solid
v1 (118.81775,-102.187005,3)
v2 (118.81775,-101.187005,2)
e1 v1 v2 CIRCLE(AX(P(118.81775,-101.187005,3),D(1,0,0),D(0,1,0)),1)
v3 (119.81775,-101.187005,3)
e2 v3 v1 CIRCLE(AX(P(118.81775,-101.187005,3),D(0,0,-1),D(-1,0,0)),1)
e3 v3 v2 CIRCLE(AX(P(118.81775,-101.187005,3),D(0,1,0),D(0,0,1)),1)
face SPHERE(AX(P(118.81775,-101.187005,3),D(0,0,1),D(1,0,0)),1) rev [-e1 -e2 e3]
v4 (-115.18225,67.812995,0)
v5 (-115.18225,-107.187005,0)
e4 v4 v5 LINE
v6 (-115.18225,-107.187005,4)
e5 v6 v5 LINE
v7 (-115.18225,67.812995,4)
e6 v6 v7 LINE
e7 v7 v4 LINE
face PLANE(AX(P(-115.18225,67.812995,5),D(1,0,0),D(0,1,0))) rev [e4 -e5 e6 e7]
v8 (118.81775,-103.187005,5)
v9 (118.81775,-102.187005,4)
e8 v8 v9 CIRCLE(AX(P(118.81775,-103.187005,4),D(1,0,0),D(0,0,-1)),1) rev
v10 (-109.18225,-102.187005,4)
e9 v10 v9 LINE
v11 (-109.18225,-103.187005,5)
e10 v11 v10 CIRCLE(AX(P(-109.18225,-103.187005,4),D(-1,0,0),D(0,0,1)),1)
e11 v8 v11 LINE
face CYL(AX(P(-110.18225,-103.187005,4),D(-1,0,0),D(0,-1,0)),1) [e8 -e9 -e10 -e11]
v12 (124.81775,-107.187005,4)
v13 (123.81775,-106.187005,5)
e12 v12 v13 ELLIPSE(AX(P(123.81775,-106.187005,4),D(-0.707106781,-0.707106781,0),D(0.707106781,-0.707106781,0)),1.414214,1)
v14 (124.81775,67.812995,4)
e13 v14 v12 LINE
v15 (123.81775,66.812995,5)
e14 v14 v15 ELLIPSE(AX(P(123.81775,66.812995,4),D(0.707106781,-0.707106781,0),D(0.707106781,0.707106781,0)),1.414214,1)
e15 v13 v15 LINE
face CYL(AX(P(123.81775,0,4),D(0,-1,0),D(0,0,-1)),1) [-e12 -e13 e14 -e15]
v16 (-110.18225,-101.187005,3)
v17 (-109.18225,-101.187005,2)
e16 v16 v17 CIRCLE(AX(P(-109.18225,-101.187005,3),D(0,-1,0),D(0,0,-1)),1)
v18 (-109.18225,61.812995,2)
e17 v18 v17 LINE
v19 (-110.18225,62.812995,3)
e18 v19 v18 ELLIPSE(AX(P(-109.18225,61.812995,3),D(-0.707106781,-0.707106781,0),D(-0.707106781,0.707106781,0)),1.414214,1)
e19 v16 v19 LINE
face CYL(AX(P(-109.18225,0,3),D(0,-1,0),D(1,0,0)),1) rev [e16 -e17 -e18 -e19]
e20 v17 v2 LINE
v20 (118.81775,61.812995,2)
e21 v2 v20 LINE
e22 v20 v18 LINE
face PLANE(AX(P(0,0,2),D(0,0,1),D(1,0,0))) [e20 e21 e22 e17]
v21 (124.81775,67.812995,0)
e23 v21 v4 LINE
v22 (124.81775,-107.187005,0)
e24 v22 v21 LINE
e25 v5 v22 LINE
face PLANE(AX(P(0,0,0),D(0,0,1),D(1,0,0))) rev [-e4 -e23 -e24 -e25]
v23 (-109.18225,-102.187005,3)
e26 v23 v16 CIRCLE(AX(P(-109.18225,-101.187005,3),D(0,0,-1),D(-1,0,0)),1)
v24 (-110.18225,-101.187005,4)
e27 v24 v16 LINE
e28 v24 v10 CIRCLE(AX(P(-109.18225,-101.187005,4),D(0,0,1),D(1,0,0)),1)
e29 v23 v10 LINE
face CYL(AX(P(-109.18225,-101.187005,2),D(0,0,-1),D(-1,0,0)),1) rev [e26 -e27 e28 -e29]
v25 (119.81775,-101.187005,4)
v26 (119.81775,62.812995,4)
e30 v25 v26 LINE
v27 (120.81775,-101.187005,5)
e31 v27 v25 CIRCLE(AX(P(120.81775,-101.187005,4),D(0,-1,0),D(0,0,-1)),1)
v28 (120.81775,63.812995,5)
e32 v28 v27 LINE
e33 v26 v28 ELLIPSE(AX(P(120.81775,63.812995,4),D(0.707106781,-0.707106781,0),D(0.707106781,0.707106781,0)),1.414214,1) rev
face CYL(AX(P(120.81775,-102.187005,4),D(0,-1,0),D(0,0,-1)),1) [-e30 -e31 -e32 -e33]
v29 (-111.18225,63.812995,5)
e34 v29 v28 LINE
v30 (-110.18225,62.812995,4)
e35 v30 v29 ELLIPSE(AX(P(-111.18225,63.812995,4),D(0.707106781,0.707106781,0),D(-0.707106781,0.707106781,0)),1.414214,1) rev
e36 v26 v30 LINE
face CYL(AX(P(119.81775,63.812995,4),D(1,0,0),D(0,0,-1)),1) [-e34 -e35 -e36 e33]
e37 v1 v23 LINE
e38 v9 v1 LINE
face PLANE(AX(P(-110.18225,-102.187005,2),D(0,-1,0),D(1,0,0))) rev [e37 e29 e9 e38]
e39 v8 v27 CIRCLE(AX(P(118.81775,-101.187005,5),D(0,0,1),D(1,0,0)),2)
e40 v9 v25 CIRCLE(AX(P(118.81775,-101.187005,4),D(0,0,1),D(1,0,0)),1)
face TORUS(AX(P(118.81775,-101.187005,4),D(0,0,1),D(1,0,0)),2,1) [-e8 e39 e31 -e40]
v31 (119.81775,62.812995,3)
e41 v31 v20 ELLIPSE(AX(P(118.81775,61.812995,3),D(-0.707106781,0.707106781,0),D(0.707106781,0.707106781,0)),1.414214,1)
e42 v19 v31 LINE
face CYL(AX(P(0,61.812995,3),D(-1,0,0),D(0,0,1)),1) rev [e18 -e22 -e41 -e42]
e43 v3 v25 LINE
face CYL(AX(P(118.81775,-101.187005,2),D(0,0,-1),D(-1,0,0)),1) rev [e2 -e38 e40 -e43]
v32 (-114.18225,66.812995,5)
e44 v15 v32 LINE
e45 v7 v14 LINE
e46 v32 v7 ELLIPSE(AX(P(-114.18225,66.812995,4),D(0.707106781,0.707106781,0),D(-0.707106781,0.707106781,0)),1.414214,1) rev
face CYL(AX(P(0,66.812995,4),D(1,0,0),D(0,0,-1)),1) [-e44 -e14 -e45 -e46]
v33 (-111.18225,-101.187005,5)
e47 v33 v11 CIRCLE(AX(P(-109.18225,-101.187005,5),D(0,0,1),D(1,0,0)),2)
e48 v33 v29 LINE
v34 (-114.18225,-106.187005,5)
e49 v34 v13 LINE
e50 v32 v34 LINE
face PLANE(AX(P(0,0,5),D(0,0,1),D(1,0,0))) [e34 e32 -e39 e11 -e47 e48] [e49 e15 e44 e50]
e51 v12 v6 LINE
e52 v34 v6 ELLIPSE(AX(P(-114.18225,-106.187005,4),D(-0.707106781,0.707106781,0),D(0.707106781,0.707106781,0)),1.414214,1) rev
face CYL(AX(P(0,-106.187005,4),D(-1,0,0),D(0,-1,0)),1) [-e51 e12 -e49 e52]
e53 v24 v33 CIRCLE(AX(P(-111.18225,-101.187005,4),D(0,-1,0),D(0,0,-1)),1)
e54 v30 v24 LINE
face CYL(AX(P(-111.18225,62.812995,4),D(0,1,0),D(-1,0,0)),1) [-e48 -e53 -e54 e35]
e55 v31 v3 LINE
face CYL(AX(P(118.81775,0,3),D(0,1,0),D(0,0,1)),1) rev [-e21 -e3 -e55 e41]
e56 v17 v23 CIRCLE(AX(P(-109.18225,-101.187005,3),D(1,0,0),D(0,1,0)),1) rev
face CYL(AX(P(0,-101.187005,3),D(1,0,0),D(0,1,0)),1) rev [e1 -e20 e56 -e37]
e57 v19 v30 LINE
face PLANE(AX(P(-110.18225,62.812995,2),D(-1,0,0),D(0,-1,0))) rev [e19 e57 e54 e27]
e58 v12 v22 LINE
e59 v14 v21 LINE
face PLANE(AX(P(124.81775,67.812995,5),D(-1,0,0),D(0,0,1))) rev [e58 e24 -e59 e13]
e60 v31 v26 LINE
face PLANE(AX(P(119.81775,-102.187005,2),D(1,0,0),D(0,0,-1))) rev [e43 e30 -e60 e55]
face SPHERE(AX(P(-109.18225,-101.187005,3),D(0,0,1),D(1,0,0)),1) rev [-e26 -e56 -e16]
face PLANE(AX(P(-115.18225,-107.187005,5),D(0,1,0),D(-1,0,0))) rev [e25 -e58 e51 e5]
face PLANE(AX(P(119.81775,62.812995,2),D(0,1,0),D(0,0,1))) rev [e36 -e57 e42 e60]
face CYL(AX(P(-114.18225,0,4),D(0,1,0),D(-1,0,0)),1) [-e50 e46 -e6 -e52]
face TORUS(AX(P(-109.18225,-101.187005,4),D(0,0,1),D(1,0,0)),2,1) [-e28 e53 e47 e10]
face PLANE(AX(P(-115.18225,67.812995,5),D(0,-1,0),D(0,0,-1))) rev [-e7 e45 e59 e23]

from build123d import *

# Parameters (mm, degrees)
SKETCH1_W           = 240
SKETCH1_H           = 175
BOSS_EXTRUDE1_DEPTH = 5
SKETCH2_W           = 230
SKETCH2_H           = 165
CUT_EXTRUDE1_DEPTH  = 3
FILLET1_R           = 1
FILLET2_R           = 1
FILLET3_R           = 1


with BuildPart() as part:
    # Sketch1 → Boss-Extrude1 (new body)
    with BuildSketch(Plane.XY):
        with Locations((4.817749604, -19.687004754)):
            Rectangle(SKETCH1_W, SKETCH1_H)
    extrude(amount=BOSS_EXTRUDE1_DEPTH)

    # Sketch2 → Cut-Extrude1 (cut)
    with BuildSketch(Plane.XY.offset(5)):
        with Locations((4.817749604, -19.687004754)):
            Rectangle(SKETCH2_W, SKETCH2_H)
    extrude(amount=-CUT_EXTRUDE1_DEPTH, mode=Mode.SUBTRACT)

    # Fillet1
    fillet1_edges = [part.edges().sort_by_distance(p)[0] for p in [
        (4.817749604, -102.187004754, 2),
        (119.817749604, -102.187004754, 3.5),
        (-110.182250396, -102.187004754, 3.5),
        (4.817749604, 62.812995246, 5),
        (-110.182250396, -19.687004754, 5),
        (4.817749604, -102.187004754, 5),
        (119.817749604, -19.687004754, 5),
    ]]
    fillet(fillet1_edges, radius=FILLET1_R)

    # Fillet2
    fillet2_edges = [part.edges().sort_by_distance(p)[0] for p in [
        (124.817749604, -19.687004754, 5),
        (4.817749604, 67.812995246, 5),
        (-115.182250396, -19.687004754, 5),
        (4.817749604, -107.187004754, 5),
    ]]
    fillet(fillet2_edges, radius=FILLET2_R)

    # Fillet3
    # the kernel refuses this fillet: 1 mm, written as the material it adds along each edge
    with BuildSketch(Plane(origin=(118.817749604, -101.187004754, 3), x_dir=(0, 0, -1), z_dir=(1, 0, 0))) as fillet3_piece_1_section:
        Polygon((0, 0), (FILLET3_R, 0), (FILLET3_R, -FILLET3_R), (0, -FILLET3_R), align=None)
    fillet3_piece_1 = extrude(amount=FILLET3_R, mode=Mode.PRIVATE)
    fillet3_piece_1 = fillet3_piece_1 - Plane(origin=(118.817749604, -101.187004754, 3), x_dir=(0, 0.7071067811865475, 0.7071067811865475), z_dir=(1, 0, 0)) * Sphere(FILLET3_R, mode=Mode.PRIVATE)
    add(fillet3_piece_1)
    with BuildSketch(Plane(origin=(-109.182250396, -101.187004754, 3), x_dir=(0, 0, -1), z_dir=(-1, 0, 0))) as fillet3_piece_2_section:
        Polygon((0, 0), (FILLET3_R, 0), (FILLET3_R, FILLET3_R), (0, FILLET3_R), align=None)
    fillet3_piece_2 = extrude(amount=FILLET3_R, mode=Mode.PRIVATE)
    fillet3_piece_2 = fillet3_piece_2 - Plane(origin=(-109.182250396, -101.187004754, 3), x_dir=(0, 0.7071067811865475, 0.7071067811865475), z_dir=(-1, 0, 0)) * Sphere(FILLET3_R, mode=Mode.PRIVATE)
    add(fillet3_piece_2)
    with BuildSketch(Plane(origin=(122.317749604, 62.812995246, 2), x_dir=(0, 0, 1), z_dir=(-1, 0, 0))) as fillet3_piece_3:
        with BuildLine():
            CenterArc((FILLET3_R, -FILLET3_R), FILLET3_R, 90, 90)
            Line((0, -FILLET3_R), (0, 0))
            Line((0, 0), (FILLET3_R, 0))
        make_face()
    extrude(amount=235)
    with BuildSketch(Plane(origin=(-110.182250396, 65.312995246, 2), x_dir=(0, 0, 1), z_dir=(0, -1, 0)), Plane(origin=(119.817749604, -101.187004754, 2), x_dir=(0, 0, 1), z_dir=(0, 1, 0))) as fillet3_piece_4:
        with BuildLine():
            CenterArc((FILLET3_R, -FILLET3_R), FILLET3_R, 90, 90)
            Line((0, -FILLET3_R), (0, 0))
            Line((0, 0), (FILLET3_R, 0))
        make_face()
    extrude(amount=166.5)


solid = part.part
